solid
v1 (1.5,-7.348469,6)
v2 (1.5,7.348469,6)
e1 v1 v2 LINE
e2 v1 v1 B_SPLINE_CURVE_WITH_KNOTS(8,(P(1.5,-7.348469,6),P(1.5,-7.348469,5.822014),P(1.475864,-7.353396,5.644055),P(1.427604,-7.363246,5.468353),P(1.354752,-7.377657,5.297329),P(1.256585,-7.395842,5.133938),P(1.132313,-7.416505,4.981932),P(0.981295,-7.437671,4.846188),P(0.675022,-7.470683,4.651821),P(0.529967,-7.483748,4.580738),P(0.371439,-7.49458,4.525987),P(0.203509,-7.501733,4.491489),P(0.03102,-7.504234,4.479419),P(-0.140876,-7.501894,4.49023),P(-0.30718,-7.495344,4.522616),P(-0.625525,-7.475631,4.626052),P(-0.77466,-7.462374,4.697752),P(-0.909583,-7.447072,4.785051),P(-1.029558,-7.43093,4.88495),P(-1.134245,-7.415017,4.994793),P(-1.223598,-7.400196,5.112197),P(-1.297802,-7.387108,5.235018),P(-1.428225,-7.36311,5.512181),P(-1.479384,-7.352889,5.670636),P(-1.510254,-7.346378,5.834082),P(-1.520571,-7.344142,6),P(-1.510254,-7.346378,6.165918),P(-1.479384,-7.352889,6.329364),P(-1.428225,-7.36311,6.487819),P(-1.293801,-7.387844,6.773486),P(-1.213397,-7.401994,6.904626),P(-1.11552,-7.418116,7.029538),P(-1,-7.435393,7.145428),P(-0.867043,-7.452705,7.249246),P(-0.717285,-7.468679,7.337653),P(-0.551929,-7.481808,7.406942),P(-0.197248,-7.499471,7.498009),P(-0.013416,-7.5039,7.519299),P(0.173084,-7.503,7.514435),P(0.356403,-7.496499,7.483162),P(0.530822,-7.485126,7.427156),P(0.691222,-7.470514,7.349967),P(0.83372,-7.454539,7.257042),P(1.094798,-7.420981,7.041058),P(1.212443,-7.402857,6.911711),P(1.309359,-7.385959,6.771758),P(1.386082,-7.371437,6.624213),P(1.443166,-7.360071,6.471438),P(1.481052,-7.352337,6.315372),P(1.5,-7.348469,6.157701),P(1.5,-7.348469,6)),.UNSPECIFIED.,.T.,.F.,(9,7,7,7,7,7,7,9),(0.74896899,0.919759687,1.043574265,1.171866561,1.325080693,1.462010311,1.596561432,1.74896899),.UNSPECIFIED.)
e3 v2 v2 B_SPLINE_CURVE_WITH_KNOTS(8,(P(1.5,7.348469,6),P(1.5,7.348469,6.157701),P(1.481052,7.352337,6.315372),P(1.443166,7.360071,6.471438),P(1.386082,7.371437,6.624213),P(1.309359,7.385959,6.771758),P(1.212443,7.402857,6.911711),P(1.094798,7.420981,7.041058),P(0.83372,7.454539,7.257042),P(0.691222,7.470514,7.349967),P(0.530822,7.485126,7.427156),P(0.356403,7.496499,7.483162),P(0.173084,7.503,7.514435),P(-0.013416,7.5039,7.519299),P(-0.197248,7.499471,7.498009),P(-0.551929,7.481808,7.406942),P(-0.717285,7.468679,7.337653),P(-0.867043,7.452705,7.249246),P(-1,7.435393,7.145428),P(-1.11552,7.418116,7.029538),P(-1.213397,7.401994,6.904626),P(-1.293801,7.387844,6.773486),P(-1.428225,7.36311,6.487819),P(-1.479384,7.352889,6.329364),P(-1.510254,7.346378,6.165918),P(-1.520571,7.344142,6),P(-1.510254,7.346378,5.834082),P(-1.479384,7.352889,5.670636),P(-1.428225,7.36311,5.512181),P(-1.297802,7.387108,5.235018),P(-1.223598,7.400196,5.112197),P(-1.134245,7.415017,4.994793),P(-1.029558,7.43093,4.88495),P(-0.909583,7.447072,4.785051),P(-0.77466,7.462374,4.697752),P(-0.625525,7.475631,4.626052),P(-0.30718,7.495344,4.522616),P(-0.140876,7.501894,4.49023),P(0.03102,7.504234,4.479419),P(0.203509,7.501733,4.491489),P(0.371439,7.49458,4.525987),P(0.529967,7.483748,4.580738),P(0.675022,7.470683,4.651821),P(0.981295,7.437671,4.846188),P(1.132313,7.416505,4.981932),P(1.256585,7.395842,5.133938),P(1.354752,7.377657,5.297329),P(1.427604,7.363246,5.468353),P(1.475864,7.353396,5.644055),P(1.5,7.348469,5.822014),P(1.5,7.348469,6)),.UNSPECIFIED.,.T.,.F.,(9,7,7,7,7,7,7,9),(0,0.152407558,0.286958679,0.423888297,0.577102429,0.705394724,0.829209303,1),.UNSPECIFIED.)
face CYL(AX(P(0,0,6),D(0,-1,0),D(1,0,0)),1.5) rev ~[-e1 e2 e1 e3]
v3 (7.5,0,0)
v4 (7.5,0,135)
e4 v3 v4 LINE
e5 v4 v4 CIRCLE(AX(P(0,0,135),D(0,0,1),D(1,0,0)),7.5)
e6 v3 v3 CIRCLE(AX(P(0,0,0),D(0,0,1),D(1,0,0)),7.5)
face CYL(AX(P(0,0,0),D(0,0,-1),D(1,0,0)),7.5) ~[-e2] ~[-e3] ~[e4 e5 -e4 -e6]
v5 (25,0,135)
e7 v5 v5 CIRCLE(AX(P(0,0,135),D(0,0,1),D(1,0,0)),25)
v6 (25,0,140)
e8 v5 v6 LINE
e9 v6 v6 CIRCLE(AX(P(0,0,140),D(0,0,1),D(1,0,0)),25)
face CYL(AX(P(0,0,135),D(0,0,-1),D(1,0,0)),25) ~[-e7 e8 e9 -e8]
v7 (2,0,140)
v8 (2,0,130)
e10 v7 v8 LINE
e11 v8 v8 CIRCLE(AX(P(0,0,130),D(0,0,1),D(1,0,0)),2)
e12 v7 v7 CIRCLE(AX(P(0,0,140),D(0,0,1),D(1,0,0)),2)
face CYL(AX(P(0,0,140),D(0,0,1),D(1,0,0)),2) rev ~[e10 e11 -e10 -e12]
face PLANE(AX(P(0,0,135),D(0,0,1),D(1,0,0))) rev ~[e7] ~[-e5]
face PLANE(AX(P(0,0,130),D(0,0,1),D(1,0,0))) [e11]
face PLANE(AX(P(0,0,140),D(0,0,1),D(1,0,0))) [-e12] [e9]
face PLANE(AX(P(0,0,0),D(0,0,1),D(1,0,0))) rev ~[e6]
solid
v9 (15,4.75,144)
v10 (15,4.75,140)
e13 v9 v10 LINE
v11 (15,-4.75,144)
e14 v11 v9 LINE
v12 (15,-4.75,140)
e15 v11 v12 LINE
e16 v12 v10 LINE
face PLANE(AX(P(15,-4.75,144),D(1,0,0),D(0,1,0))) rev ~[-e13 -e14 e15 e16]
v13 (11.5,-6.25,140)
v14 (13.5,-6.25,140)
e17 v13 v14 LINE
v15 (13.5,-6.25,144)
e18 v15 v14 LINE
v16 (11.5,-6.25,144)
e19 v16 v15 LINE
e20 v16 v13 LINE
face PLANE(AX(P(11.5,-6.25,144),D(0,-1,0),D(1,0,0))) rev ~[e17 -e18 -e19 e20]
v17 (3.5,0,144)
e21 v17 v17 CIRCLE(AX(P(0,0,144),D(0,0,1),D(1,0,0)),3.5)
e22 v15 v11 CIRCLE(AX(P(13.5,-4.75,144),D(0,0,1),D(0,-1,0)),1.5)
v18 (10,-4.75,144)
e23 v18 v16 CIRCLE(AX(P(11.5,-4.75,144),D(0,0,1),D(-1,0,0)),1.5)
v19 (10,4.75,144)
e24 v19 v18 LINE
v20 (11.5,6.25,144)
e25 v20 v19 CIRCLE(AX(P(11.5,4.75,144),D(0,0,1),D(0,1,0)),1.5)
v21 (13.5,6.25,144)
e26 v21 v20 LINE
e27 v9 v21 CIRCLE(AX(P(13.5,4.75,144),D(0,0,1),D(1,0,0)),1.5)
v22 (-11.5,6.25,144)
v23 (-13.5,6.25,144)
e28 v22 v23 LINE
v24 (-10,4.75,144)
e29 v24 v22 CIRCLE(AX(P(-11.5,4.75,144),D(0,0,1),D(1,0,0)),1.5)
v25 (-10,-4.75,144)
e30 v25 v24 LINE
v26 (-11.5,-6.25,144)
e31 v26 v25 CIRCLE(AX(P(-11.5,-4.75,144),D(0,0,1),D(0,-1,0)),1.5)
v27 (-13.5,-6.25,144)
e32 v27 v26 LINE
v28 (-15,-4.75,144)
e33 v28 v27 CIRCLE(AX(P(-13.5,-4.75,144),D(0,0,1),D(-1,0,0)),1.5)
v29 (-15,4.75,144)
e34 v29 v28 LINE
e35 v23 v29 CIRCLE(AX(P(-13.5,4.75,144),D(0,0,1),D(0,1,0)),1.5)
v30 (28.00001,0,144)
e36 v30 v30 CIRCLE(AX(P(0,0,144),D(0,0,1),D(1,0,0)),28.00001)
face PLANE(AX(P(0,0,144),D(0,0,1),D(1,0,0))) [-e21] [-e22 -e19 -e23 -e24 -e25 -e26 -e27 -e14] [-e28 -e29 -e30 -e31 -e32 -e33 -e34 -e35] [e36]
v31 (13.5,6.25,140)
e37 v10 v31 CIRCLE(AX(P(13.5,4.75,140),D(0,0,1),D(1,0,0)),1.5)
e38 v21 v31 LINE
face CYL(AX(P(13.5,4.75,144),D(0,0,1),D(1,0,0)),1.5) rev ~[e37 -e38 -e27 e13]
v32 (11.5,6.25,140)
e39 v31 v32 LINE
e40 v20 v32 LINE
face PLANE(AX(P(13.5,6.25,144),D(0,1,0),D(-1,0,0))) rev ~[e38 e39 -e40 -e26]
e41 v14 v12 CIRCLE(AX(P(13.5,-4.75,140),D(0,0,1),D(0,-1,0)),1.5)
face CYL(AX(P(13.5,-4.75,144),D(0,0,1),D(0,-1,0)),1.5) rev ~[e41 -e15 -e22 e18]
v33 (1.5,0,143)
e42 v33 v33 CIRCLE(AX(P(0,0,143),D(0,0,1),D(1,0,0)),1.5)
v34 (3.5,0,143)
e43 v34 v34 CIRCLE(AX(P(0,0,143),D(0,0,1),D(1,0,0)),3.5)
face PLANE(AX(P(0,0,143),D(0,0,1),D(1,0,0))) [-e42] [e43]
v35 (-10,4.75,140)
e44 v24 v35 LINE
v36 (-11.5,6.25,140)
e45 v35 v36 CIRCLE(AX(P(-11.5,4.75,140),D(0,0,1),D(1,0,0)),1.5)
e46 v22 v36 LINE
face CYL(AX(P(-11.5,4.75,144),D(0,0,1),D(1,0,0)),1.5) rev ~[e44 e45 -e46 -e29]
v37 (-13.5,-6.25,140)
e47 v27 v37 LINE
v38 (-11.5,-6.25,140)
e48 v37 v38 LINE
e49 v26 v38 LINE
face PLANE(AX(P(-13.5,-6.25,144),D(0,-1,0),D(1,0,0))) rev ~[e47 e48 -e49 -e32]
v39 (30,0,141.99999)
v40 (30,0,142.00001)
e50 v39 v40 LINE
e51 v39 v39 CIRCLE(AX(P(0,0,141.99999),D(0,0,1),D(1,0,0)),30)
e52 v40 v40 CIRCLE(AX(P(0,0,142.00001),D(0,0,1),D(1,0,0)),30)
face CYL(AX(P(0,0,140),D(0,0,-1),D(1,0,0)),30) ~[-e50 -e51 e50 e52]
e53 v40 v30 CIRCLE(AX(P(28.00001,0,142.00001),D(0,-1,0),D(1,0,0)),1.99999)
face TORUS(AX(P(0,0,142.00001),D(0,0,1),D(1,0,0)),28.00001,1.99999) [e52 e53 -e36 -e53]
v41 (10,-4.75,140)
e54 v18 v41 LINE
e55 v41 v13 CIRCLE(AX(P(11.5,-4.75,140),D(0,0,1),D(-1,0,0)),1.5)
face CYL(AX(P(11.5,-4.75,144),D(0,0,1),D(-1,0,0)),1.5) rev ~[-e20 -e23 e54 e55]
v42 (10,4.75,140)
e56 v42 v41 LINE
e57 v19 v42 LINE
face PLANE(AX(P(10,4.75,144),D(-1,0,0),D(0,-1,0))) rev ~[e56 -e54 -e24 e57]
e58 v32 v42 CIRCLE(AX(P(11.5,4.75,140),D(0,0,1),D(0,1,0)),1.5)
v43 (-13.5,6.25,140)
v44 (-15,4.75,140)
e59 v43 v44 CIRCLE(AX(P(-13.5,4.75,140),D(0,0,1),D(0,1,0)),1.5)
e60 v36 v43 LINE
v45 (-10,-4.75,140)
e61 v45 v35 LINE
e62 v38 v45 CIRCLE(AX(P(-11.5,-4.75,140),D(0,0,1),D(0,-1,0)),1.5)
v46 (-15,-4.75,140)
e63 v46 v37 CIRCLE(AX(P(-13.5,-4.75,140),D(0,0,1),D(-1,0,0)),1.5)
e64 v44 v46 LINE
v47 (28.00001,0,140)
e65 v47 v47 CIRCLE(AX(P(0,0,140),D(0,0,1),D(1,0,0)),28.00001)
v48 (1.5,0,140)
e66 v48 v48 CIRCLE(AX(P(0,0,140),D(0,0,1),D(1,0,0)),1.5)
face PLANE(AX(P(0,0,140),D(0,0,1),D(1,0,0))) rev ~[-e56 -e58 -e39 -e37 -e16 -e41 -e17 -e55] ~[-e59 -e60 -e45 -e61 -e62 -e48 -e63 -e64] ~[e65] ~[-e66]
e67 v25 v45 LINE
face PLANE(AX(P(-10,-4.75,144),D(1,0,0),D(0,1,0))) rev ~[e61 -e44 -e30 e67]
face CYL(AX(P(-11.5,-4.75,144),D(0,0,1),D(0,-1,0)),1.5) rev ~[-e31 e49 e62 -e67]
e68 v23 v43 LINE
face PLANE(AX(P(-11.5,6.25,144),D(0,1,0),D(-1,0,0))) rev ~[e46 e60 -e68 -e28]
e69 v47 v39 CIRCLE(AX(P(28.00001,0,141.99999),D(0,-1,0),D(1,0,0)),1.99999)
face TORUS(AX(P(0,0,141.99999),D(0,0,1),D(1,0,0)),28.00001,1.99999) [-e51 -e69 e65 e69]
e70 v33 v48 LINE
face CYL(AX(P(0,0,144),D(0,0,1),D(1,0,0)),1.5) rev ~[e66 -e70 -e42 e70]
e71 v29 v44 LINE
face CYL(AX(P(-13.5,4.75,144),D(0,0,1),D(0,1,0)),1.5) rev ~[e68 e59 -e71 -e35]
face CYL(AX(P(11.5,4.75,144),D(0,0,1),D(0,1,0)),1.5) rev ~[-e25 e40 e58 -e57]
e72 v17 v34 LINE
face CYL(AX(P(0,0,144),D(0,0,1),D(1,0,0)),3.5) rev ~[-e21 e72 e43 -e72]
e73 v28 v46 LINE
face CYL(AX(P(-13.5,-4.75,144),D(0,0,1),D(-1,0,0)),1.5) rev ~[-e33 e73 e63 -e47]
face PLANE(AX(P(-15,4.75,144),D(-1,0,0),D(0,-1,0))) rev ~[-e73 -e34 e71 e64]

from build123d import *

# Parameters (mm, degrees)
F0_R          = 7.5
F1_DEPTH      = 135
F2_R          = 25
F3_DEPTH      = 5
F4_R          = 1.5
F5_DEPTH      = 7.5
F5_DEPTH_BACK = 7.5
F6_R          = 2
F7_DEPTH      = 10
F8_R          = 30
F8_R_2        = 2
F9_DEPTH      = 4
F11_DEPTH     = 4
F12_R         = 2
F12_R_2       = 1.5
F13_DEPTH     = 4
F12_R_3       = 3.5
F14_DEPTH     = 1
F15_R         = 1.99999


# Not quite as in the source:
# - a fillet or chamfer is up to 0.001 mm smaller than in the source, because OpenCascade refuses the exact size


with BuildPart() as f1:
    # F0 (on Top) → F1 (new body)
    with BuildSketch(Plane.XY):
        Circle(F0_R)
    extrude(amount=F1_DEPTH)

    # F2 (on face) → F3 (join)
    with BuildSketch(Plane.XY.offset(135)):
        Circle(F2_R)
    extrude(amount=F3_DEPTH)

    # F4 (on Front) → F5 (cut, two sides)
    with BuildSketch(Plane.XZ) as f5_sk:
        with Locations((0, 6)):
            Circle(F4_R)
    extrude(amount=-F5_DEPTH, mode=Mode.SUBTRACT)
    extrude(f5_sk.sketch, amount=F5_DEPTH_BACK, mode=Mode.SUBTRACT)

    # F6 (on face) → F7 (cut)
    with BuildSketch(Plane.XY.offset(140)):
        Circle(F6_R)
    extrude(amount=-F7_DEPTH, mode=Mode.SUBTRACT)


with BuildPart() as f9:
    # F8 (on face) → F9 (new body)
    with BuildSketch(Plane.XY.offset(140)):
        Circle(F8_R)
        Circle(F8_R_2, mode=Mode.SUBTRACT)
    extrude(amount=F9_DEPTH)

    # F10 (on face) → F11 (cut, through all)
    with BuildSketch(Plane.XY.offset(144)):
        with BuildLine():
            Line((13.5, 6.25), (11.5, 6.25))
            ThreePointArc((11.5, 6.25), (10.4393398282, 5.8106601718), (10, 4.75))
            Line((10, 4.75), (10, -4.75))
            ThreePointArc((10, -4.75), (10.4393398282, -5.8106601718), (11.5, -6.25))
            Line((11.5, -6.25), (13.5, -6.25))
            ThreePointArc((13.5, -6.25), (14.5606601718, -5.8106601718), (15, -4.75))
            Line((15, -4.75), (15, 4.75))
            ThreePointArc((15, 4.75), (14.5606601718, 5.8106601718), (13.5, 6.25))
        make_face()
        with BuildLine():
            ThreePointArc((-10, 4.75), (-10.4393398282, 5.8106601718), (-11.5, 6.25))
            Line((-11.5, 6.25), (-13.5, 6.25))
            ThreePointArc((-13.5, 6.25), (-14.5606601718, 5.8106601718), (-15, 4.75))
            Line((-15, 4.75), (-15, -4.75))
            ThreePointArc((-15, -4.75), (-14.5606601718, -5.8106601718), (-13.5, -6.25))
            Line((-13.5, -6.25), (-11.5, -6.25))
            ThreePointArc((-11.5, -6.25), (-10.4393398282, -5.8106601718), (-10, -4.75))
            Line((-10, -4.75), (-10, 4.75))
        make_face()
    extrude(amount=-F11_DEPTH, mode=Mode.SUBTRACT)

    # F12 (on face) → F13 (join, through all)
    with BuildSketch(Plane.XY.offset(144)):
        Circle(F12_R)
        Circle(F12_R_2, mode=Mode.SUBTRACT)
    extrude(amount=-F13_DEPTH)

    # F12 (on face) → F14 (cut)
    with BuildSketch(Plane.XY.offset(144)):
        Circle(F12_R_3)
        Circle(F12_R, mode=Mode.SUBTRACT)
        Circle(F12_R)
        Circle(F12_R_2, mode=Mode.SUBTRACT)
    extrude(amount=-F14_DEPTH, mode=Mode.SUBTRACT)

    # F15 (radius 2 in the source; OpenCascade refuses exactly that, so slightly less here)
    f15_edges = [f9.edges().sort_by_distance(p)[0] for p in [
        (-30, 0, 144),
        (-30, 0, 140),
    ]]
    fillet(f15_edges, radius=F15_R)


solid = Compound([f1.part, f9.part])
